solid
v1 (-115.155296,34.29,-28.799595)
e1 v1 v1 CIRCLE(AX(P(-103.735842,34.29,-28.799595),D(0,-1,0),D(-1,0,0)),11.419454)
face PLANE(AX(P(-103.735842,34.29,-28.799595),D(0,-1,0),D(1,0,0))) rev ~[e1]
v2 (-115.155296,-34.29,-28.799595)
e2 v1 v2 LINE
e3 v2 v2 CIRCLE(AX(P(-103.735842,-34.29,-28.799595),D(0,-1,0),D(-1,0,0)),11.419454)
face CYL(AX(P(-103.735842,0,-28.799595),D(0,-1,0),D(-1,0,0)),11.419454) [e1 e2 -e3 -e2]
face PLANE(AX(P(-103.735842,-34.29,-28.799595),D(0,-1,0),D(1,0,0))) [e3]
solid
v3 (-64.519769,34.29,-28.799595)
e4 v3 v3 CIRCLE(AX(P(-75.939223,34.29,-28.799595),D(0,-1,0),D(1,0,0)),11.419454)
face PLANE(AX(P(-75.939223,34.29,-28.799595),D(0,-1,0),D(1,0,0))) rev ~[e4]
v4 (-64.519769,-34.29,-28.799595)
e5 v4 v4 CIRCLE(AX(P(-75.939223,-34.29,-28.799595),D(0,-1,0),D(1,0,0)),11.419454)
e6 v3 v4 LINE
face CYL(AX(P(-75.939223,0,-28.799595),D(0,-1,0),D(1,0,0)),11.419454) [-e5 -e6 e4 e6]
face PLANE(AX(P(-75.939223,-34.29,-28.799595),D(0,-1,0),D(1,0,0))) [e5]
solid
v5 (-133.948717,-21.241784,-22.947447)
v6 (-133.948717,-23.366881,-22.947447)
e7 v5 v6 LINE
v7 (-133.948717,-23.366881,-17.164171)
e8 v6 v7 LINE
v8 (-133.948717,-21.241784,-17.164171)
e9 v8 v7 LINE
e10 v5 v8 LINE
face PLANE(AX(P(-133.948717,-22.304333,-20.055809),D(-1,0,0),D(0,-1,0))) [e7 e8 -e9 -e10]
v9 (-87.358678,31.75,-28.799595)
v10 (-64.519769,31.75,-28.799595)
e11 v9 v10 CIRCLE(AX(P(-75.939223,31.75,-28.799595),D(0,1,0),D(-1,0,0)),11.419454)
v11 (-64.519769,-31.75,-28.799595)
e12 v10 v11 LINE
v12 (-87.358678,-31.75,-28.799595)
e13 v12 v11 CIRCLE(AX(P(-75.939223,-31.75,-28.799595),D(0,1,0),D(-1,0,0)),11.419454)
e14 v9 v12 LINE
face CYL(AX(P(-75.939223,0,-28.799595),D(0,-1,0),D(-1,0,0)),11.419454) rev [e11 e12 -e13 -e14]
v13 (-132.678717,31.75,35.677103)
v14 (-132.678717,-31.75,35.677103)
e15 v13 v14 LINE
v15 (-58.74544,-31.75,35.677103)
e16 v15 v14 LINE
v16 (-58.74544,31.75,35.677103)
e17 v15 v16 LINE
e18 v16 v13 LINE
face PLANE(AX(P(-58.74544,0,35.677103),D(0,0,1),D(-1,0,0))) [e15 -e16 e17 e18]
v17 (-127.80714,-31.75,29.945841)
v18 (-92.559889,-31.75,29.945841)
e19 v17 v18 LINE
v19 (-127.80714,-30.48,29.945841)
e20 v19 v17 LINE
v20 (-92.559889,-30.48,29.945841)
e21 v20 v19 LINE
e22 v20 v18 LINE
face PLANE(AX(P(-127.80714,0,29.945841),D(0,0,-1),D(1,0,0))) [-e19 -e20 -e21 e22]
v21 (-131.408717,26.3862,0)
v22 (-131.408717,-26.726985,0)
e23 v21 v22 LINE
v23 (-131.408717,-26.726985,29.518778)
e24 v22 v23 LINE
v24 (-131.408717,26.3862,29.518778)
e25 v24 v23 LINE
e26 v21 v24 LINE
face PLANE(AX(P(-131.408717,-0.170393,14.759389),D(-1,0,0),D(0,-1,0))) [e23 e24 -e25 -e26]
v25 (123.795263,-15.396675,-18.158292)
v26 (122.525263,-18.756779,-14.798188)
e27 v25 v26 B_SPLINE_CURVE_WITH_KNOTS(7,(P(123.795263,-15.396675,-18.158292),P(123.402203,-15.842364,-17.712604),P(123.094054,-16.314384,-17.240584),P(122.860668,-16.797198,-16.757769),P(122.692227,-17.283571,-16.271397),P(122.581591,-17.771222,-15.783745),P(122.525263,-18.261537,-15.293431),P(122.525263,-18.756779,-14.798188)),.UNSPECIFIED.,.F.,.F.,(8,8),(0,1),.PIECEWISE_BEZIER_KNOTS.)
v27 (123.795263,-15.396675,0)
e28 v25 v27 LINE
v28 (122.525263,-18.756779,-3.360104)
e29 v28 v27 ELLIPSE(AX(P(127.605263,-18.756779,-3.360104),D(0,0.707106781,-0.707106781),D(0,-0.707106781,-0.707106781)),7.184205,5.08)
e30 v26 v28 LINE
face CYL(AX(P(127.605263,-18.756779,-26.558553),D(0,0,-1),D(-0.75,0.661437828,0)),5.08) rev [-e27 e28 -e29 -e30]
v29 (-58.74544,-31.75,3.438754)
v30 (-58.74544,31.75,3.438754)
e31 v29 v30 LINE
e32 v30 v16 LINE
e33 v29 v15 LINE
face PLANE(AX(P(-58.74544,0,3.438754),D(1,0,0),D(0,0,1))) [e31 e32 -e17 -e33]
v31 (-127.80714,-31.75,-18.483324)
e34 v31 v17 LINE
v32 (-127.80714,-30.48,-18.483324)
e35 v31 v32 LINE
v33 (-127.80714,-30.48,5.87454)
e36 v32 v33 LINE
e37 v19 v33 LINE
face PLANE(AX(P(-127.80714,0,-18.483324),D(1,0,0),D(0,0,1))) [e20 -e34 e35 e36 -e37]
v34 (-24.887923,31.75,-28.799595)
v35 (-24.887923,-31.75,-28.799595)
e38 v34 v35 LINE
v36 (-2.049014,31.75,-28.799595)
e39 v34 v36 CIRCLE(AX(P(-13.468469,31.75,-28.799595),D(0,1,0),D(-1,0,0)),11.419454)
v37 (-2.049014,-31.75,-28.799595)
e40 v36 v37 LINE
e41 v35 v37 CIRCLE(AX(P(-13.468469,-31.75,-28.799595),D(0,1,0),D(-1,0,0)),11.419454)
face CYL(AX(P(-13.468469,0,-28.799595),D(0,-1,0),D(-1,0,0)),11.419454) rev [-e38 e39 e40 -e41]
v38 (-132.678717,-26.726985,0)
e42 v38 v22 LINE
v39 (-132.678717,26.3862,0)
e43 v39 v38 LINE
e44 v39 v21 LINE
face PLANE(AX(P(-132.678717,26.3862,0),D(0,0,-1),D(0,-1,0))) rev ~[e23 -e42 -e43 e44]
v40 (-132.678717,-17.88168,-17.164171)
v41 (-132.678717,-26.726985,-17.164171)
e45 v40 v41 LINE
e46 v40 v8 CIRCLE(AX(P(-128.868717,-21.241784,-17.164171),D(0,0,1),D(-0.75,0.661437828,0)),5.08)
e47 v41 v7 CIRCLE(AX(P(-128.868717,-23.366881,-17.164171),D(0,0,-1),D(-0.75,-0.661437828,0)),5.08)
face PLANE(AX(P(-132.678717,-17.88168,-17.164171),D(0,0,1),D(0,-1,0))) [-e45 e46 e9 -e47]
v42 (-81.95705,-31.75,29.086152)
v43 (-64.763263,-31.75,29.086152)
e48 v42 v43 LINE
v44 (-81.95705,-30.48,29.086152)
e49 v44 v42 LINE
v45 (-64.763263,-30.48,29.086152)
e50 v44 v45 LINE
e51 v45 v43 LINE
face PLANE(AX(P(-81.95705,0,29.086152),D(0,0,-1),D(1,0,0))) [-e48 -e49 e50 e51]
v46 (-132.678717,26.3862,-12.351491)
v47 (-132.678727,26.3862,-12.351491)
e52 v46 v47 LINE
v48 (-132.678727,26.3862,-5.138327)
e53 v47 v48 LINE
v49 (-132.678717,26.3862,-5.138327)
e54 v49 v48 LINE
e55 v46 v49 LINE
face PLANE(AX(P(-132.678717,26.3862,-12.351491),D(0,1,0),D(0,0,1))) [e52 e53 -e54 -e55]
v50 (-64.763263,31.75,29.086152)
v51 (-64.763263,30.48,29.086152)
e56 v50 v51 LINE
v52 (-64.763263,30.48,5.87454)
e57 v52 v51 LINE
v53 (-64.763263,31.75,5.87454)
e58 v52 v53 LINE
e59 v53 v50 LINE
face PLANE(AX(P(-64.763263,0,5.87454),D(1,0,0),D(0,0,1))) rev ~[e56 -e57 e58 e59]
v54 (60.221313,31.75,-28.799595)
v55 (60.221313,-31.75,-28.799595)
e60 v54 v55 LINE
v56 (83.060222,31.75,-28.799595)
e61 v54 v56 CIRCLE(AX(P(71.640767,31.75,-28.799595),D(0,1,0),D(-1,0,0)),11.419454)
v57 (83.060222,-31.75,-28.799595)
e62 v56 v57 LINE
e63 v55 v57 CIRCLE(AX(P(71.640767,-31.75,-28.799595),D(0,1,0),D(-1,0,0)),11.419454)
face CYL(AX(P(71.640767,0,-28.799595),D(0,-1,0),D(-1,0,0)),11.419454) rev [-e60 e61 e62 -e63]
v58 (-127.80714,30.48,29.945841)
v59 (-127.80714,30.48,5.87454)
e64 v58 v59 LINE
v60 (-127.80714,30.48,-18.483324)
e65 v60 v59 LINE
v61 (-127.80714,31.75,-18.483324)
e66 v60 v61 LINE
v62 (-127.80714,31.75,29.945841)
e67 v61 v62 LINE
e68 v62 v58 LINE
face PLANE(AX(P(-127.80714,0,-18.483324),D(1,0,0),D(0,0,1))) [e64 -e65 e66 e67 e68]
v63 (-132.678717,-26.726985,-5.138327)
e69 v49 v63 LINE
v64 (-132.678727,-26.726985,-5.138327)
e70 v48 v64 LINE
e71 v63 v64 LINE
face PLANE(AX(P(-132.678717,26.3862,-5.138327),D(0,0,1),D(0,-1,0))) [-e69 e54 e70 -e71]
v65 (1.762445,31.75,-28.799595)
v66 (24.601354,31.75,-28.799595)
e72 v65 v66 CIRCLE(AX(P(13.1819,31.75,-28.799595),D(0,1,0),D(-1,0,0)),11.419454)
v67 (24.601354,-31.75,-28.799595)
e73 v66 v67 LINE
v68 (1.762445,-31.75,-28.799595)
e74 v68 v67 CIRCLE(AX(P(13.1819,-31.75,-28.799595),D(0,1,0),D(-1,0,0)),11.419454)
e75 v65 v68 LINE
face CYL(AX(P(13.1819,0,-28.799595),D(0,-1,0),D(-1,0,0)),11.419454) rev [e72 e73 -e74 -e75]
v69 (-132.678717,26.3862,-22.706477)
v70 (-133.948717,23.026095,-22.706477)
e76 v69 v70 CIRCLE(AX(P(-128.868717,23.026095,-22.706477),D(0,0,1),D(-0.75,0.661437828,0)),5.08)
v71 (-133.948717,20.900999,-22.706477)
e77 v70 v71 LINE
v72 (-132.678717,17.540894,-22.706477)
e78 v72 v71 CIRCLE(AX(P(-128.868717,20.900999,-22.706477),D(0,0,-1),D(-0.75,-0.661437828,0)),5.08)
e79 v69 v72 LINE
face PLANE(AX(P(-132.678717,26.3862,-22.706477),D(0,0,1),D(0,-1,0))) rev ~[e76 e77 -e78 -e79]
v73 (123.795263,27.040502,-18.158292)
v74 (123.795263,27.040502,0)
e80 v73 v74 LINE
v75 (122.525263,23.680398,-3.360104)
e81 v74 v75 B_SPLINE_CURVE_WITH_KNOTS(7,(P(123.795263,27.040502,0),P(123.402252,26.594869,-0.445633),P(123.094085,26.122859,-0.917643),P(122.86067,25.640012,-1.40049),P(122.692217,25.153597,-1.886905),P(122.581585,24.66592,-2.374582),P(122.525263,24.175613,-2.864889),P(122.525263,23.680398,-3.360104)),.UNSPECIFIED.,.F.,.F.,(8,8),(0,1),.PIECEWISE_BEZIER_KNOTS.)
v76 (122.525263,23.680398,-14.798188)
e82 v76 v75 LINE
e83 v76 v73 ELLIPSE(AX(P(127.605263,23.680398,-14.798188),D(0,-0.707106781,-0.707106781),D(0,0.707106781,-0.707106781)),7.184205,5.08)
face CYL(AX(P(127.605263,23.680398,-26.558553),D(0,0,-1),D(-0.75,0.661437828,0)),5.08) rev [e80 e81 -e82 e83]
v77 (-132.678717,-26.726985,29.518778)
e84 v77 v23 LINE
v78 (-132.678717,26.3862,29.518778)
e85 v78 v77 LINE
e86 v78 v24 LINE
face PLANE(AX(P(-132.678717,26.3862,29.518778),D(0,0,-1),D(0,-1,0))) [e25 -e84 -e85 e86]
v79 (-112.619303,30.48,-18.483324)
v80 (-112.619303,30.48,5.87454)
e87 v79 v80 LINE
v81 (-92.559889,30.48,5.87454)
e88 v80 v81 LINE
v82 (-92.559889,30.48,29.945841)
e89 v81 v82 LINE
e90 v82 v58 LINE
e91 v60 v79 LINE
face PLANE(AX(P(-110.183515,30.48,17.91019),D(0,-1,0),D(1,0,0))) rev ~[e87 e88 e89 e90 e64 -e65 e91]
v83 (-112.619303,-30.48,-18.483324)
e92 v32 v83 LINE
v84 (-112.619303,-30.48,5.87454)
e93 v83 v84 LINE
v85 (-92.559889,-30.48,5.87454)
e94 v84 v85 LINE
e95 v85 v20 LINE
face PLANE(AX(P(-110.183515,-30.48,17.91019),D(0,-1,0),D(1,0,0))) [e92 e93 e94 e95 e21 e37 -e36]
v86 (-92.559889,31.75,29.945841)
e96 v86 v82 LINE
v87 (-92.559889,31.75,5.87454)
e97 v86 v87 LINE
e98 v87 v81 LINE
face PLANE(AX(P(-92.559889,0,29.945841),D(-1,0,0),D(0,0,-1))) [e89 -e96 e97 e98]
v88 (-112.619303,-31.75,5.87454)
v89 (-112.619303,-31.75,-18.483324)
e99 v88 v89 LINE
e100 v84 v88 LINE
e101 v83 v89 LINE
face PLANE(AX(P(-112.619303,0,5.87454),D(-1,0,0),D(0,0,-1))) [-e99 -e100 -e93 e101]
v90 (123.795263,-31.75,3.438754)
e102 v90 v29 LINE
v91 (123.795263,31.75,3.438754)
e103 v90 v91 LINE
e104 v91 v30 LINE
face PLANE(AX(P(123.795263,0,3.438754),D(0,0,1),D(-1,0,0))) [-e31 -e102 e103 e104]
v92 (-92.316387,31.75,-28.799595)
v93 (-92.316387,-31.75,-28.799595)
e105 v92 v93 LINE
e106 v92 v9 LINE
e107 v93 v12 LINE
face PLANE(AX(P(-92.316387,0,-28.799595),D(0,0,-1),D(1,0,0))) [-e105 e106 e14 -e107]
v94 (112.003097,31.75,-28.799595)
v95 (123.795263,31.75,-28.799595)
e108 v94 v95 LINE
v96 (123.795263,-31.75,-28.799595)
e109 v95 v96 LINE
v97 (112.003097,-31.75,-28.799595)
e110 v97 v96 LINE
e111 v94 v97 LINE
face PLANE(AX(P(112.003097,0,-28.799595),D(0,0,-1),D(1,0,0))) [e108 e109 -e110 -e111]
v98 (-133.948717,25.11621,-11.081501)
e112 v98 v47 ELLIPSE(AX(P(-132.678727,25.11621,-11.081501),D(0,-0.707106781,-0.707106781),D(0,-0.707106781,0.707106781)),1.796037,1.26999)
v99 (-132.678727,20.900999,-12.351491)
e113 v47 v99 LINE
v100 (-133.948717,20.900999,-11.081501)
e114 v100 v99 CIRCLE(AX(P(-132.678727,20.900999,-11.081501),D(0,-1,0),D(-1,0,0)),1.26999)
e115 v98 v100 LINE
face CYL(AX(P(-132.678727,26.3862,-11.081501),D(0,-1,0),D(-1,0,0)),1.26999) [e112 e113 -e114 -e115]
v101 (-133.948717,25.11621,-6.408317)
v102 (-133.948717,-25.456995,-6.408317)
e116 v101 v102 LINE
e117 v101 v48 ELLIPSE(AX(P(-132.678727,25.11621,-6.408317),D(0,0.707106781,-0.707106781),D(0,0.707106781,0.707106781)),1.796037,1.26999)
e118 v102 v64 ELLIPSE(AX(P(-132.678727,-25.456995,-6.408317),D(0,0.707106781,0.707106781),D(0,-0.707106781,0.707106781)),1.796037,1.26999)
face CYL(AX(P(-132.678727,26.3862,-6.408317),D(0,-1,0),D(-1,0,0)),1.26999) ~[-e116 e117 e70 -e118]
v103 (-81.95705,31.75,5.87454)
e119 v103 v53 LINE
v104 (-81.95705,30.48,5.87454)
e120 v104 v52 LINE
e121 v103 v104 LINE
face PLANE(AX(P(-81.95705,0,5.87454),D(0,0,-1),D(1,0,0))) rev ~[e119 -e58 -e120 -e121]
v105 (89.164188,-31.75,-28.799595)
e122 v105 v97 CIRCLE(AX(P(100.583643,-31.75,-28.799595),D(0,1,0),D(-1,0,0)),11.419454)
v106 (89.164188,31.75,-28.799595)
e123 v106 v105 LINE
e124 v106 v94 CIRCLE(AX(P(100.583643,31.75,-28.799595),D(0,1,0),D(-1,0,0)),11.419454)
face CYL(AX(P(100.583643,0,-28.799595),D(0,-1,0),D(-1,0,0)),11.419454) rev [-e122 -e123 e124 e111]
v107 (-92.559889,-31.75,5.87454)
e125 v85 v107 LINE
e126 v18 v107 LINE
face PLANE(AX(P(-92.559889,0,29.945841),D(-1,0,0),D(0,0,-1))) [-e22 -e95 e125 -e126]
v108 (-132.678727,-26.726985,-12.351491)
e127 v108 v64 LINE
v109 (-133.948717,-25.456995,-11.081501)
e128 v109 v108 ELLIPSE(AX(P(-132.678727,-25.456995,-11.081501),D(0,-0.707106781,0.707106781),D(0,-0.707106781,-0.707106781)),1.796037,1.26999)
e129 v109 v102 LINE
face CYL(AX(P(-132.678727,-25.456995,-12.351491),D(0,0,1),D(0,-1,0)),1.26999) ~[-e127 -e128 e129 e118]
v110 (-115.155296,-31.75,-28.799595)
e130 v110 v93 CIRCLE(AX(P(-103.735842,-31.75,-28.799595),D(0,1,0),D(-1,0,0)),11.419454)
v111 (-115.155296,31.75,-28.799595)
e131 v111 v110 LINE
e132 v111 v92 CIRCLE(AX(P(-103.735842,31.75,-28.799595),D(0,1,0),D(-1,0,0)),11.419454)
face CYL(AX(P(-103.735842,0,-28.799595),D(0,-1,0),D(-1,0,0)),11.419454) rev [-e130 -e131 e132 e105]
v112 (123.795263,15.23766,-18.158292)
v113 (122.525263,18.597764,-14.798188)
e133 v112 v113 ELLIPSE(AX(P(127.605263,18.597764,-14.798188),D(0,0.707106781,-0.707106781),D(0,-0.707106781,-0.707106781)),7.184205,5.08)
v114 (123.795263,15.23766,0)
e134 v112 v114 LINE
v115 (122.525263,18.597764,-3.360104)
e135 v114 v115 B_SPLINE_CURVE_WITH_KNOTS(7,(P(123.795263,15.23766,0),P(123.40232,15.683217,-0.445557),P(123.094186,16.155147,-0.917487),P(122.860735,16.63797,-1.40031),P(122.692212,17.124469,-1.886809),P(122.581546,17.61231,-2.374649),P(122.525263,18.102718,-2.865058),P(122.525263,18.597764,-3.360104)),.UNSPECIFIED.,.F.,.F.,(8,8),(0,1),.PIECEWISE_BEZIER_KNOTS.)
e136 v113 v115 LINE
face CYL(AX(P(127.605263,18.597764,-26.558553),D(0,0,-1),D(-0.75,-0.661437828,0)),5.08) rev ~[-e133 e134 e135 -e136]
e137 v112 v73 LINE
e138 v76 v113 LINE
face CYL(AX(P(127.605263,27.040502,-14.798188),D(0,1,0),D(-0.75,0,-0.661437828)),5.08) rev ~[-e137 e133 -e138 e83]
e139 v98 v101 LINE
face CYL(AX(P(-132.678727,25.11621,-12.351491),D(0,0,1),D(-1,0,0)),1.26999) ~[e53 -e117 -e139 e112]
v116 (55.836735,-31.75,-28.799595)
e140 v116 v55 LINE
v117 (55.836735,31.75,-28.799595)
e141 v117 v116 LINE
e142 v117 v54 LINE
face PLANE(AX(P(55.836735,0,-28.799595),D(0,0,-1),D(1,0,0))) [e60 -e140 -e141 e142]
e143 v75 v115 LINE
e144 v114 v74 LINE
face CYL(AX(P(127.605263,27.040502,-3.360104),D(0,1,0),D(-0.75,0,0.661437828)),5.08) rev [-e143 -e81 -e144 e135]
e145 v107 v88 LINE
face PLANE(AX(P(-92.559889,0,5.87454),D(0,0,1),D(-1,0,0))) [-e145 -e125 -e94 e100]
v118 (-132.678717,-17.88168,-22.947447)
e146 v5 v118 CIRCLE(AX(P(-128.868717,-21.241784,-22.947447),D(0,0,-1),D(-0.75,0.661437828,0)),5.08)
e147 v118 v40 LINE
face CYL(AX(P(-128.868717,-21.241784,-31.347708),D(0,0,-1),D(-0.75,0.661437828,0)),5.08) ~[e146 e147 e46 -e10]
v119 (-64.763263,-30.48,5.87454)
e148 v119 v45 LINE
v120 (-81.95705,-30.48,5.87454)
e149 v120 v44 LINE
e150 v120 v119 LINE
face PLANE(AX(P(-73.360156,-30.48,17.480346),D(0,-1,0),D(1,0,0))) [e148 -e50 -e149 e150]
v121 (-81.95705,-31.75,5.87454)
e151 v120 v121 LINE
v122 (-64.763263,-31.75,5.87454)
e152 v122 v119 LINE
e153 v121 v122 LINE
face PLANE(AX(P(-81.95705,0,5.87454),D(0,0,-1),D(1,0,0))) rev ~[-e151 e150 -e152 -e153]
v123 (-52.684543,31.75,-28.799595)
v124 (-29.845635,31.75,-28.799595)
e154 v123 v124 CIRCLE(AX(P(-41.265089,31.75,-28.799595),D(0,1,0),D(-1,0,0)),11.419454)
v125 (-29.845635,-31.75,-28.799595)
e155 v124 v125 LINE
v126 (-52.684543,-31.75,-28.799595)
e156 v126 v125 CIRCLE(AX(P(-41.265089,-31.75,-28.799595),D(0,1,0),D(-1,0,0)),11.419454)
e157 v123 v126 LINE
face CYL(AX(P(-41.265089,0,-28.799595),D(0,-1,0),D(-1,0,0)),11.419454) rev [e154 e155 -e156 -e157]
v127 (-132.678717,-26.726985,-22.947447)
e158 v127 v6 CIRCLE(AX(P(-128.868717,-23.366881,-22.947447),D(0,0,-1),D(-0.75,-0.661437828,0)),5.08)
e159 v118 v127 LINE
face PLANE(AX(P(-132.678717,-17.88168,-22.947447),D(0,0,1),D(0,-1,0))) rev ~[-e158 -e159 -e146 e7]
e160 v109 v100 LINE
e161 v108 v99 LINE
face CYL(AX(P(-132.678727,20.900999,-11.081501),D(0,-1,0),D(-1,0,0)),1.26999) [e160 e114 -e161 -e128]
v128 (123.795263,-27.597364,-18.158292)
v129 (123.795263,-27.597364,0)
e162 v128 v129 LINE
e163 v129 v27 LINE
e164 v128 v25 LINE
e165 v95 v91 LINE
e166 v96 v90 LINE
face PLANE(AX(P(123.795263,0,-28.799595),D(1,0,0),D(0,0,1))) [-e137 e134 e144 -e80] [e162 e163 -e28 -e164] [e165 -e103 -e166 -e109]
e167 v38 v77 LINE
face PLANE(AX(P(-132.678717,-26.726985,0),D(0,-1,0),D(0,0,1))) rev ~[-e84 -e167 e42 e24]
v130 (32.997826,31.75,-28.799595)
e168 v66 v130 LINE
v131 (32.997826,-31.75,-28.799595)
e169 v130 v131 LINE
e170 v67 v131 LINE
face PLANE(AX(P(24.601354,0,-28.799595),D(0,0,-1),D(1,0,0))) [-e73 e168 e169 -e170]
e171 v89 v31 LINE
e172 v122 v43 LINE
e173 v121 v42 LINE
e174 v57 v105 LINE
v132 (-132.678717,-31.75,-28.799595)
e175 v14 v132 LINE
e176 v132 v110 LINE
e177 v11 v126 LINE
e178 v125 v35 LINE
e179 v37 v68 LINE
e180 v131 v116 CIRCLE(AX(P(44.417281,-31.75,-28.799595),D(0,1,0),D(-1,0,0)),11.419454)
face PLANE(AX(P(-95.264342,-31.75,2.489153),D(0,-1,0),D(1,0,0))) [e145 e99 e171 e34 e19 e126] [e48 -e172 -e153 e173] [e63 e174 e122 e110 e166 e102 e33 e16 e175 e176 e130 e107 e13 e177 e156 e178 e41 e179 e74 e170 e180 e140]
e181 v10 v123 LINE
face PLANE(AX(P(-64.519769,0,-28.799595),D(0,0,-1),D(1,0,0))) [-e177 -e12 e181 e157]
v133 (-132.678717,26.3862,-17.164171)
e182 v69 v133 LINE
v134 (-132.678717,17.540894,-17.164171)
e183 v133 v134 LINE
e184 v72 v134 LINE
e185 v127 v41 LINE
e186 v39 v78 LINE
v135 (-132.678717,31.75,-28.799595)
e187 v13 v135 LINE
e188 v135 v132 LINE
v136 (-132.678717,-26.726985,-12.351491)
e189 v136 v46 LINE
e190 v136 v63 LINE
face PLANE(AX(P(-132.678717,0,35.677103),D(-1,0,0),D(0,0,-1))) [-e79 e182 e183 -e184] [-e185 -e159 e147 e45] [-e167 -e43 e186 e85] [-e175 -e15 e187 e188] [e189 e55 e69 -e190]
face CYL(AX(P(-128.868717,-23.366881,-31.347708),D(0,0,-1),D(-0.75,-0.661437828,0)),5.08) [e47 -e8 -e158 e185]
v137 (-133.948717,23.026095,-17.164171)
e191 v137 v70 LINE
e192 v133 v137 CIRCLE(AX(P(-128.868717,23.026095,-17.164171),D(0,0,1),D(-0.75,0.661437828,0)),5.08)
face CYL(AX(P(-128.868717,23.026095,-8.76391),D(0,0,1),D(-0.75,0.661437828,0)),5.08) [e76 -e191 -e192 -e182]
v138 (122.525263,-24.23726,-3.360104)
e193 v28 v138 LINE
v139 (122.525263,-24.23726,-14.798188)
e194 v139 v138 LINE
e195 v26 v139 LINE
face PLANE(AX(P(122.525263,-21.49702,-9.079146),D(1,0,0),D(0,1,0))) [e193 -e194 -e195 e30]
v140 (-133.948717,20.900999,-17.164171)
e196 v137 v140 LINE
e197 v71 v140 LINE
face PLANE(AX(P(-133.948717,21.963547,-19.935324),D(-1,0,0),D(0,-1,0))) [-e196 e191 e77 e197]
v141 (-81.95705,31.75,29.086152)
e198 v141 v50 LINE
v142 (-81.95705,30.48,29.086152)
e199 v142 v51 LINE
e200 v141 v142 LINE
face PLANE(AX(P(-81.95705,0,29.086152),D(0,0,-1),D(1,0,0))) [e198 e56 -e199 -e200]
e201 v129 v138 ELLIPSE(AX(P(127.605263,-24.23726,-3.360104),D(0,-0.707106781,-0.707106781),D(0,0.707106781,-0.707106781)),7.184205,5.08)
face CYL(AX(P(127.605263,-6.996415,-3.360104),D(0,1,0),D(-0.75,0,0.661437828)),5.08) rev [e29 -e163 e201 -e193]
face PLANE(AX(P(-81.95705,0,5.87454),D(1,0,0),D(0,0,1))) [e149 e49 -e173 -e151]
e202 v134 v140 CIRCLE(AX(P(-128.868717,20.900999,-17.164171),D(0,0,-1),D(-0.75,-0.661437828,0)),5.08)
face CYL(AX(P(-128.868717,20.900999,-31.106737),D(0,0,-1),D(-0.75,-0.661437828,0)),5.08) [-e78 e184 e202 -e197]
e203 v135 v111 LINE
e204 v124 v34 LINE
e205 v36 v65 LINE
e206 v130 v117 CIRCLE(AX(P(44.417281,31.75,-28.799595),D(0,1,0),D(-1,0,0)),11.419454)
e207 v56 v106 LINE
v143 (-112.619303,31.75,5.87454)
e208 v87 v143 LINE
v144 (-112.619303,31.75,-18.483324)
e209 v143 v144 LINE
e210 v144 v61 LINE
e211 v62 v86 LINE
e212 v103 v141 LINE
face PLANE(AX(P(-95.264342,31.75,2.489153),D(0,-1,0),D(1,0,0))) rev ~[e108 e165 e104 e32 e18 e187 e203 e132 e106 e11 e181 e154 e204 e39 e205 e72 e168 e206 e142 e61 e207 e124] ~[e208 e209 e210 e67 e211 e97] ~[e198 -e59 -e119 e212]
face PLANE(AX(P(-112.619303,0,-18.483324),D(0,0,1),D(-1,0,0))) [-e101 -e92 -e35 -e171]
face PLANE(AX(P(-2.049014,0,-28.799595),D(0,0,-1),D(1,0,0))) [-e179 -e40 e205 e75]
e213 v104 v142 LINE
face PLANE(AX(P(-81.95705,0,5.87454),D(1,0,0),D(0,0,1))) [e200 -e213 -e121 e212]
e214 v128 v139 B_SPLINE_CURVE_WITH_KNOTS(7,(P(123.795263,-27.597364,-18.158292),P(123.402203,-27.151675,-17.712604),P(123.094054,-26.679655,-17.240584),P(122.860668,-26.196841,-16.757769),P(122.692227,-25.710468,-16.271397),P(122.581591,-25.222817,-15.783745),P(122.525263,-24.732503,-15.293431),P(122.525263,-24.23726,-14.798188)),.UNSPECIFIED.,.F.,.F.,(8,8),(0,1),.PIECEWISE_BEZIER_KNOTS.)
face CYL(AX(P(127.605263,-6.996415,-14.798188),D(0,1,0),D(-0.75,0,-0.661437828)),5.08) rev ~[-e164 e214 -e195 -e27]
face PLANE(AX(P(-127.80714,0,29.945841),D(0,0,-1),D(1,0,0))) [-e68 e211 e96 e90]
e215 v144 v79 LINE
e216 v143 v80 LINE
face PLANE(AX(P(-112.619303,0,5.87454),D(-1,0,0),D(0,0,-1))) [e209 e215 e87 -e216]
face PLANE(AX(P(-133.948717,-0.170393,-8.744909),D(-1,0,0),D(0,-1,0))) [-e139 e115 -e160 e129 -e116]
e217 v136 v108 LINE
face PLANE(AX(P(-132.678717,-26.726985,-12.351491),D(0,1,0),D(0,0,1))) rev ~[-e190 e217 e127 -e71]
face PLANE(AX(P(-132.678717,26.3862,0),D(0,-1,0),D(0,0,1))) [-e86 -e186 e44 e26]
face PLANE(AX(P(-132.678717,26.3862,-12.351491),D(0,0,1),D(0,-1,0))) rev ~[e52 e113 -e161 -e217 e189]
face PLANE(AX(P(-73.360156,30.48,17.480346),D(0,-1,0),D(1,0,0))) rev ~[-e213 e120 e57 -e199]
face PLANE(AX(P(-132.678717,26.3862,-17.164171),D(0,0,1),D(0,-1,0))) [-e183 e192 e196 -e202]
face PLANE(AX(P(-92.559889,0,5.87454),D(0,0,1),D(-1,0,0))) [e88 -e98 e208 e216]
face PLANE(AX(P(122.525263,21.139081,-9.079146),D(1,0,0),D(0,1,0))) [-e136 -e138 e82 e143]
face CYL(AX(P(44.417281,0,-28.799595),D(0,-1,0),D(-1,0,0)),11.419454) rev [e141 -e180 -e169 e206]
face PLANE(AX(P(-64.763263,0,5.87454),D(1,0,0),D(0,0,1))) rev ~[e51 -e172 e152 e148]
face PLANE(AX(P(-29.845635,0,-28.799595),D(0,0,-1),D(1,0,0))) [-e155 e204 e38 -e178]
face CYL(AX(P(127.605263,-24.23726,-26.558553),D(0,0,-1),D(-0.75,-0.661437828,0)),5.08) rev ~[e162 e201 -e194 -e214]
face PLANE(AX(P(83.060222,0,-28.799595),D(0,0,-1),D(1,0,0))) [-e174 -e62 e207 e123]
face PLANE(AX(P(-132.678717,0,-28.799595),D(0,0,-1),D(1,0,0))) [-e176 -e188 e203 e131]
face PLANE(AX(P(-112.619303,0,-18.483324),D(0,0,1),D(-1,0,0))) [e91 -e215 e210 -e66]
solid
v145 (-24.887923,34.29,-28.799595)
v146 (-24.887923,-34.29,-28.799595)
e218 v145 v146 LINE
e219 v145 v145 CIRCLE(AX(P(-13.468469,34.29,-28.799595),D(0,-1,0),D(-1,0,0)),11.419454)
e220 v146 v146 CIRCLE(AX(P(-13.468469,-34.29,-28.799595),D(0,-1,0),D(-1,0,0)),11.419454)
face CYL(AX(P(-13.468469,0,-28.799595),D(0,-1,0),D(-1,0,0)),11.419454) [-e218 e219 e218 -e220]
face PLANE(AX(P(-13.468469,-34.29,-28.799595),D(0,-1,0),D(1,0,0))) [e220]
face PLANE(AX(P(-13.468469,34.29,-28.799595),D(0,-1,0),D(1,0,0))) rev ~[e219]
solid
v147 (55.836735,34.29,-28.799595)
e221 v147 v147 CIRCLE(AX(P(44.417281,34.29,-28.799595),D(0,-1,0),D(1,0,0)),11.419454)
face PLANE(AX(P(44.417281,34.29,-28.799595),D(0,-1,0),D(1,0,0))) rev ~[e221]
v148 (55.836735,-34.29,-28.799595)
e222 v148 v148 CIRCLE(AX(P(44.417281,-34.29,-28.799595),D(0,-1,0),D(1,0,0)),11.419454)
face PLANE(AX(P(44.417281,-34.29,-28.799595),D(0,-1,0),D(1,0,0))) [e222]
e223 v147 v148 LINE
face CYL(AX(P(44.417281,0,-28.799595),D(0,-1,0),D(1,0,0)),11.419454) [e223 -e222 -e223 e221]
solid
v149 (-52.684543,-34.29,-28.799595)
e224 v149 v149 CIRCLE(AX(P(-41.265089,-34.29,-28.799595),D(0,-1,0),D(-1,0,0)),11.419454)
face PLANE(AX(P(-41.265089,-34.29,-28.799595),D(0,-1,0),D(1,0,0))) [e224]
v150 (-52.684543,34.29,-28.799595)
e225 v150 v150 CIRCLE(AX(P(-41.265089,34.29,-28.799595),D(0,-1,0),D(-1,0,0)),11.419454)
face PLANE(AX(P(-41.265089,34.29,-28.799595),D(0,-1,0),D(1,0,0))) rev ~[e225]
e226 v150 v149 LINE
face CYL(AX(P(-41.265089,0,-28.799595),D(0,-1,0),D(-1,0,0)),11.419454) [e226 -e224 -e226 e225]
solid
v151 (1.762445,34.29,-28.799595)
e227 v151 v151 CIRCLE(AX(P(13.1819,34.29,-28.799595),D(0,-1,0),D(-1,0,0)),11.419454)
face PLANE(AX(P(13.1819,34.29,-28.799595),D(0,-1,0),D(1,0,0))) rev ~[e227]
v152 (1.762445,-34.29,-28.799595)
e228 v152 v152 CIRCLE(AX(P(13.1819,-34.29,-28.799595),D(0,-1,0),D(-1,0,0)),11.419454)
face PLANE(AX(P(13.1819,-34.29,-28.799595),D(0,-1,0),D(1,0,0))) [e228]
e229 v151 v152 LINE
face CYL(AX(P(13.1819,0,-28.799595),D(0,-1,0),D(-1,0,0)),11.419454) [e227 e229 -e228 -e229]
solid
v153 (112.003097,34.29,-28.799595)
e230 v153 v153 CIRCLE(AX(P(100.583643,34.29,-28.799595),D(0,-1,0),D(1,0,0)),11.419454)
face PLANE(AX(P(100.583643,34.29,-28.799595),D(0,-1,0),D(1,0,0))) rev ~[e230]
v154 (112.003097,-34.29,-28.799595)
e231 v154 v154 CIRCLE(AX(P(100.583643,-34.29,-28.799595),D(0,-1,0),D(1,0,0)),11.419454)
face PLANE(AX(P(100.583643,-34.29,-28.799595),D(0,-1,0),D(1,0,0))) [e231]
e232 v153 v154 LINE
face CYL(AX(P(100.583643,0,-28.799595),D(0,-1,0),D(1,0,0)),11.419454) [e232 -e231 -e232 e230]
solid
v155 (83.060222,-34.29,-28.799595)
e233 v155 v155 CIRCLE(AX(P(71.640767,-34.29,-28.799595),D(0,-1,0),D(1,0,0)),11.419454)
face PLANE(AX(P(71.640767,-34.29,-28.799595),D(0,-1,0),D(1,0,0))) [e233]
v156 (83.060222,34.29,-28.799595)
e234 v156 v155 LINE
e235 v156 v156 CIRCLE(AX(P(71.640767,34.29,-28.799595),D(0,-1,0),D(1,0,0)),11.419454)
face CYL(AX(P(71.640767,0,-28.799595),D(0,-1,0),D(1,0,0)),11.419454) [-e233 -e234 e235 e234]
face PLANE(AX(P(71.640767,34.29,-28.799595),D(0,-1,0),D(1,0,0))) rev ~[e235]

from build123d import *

# Parameters (mm, degrees)
F0_W         = 17.1937867999
F0_H         = 23.2116123661
F1_DEPTH     = 31.75
F2_W         = 8.8453050703
F2_H         = 5.5423062295
F2_H_2       = 5.7832766324
F2_W_2       = 53.1131848693
F2_H_3       = 7.2131637233
F3_DEPTH     = 1.27
F2_H_4       = 29.5187777961
F4_DEPTH     = 1.27
F5_T1_DEPTH  = 14.1835370451
F5_T6_DEPTH  = 22.3428270547
F5_T11_DEPTH = 22.3428270547
F6_R         = 1.26999
F7_DEPTH     = 34.29
F0_W_2       = 15.1878371835
F0_H_2       = 24.3578637019
F8_DEPTH     = 30.48
F9_W         = 12.2006889433
F9_H         = 18.1582923979
F9_W_2       = 11.8028419092
F10_DEPTH    = 1.27
F11_T1_DEPTH = 26.5585528105
F11_T3_DEPTH = 20.6009493559
F11_T5_DEPTH = 20.2031023219


# Not quite as in the source:
# - a fillet or chamfer that OpenCascade refuses, or shapes differently, is made with other operations: its cross-section is extruded or revolved along the edge and cut away or added
# - a fillet or chamfer is up to 0.001 mm smaller than in the source, because OpenCascade refuses the exact size


with BuildPart() as f1:
    # F0 (on Front) → F1 (new body, symmetric)
    with BuildSketch(Plane.XZ):
        with BuildLine():
            Line((-58.7454400957, 35.6771033257), (-132.6787173748, 35.6771033257))
            Line((-132.6787173748, 35.6771033257), (-132.6787173748, -28.7995953113))
            Line((-132.6787173748, -28.7995953113), (-115.1552961537, -28.7995953113))
            ThreePointArc((-115.1552961537, -28.7995953113), (-103.7358418107, -17.3801409683), (-92.3163874677, -28.7995953113))
            Line((-92.3163874677, -28.7995953113), (-87.3586775133, -28.7995953113))
            ThreePointArc((-87.3586775133, -28.7995953113), (-75.9392231703, -17.3801409683), (-64.5197688273, -28.7995953113))
            Line((-64.5197688273, -28.7995953113), (-58.7454400957, -28.7995953113))
            Line((-58.7454400957, -28.7995953113), (-58.7454400957, 3.4387540072))
            Line((-58.7454400957, 3.4387540072), (-58.7454400957, 35.6771033257))
        make_face()
        Polygon((-127.8071403503, 5.8745397255), (-127.8071403503, 29.9458410591), (-92.5598889589, 29.9458410591), (-92.5598889589, 5.8745397255), (-112.6193031669, 5.8745397255), (-112.6193031669, -18.4833239764), (-127.8071403503, -18.4833239764), align=None, mode=Mode.SUBTRACT)
        with Locations((-73.3601562679, 17.4803459086)):
            Rectangle(F0_W, F0_H, mode=Mode.SUBTRACT)
        with BuildLine():
            Line((123.7952634692, 3.4387540072), (-58.7454400957, 3.4387540072))
            Line((-58.7454400957, 3.4387540072), (-58.7454400957, -28.7995953113))
            Line((-58.7454400957, -28.7995953113), (-52.6845434078, -28.7995953113))
            ThreePointArc((-52.6845434078, -28.7995953113), (-41.2650890648, -17.3801409683), (-29.8456347218, -28.7995953113))
            Line((-29.8456347218, -28.7995953113), (-24.8879229048, -28.7995953113))
            ThreePointArc((-24.8879229048, -28.7995953113), (-13.4684685618, -17.3801409683), (-2.0490142188, -28.7995953113))
            Line((-2.0490142188, -28.7995953113), (1.7624453312, -28.7995953113))
            ThreePointArc((1.7624453312, -28.7995953113), (13.1818996742, -17.3801409683), (24.6013540172, -28.7995953113))
            Line((24.6013540172, -28.7995953113), (32.9978263608, -28.7995953113))
            ThreePointArc((32.9978263608, -28.7995953113), (44.4172807038, -17.3801409683), (55.8367350468, -28.7995953113))
            Line((55.8367350468, -28.7995953113), (60.2213128141, -28.7995953113))
            ThreePointArc((60.2213128141, -28.7995953113), (71.6407671571, -17.3801409683), (83.0602215001, -28.7995953113))
            Line((83.0602215001, -28.7995953113), (89.1641883782, -28.7995953113))
            ThreePointArc((89.1641883782, -28.7995953113), (100.5836427212, -17.3801409683), (112.0030970642, -28.7995953113))
            Line((112.0030970642, -28.7995953113), (123.7952634692, -28.7995953113))
            Line((123.7952634692, -28.7995953113), (123.7952634692, 3.4387540072))
        make_face()
    extrude(amount=F1_DEPTH, both=True)

    # F2 (on face) → F3 (join)
    with BuildSketch(Plane(origin=(-132.6787173748, 0, 0), x_dir=(0, -1, 0), z_dir=(-1, 0, 0))):
        with Locations((-21.9635469839, -19.9353238568)):
            Rectangle(F2_W, F2_H)
        with Locations((22.3043328151, -20.0558090582)):
            Rectangle(F2_W, F2_H_2)
        with Locations((0.1703929156, -8.744909234)):
            Rectangle(F2_W_2, F2_H_3)
    extrude(amount=F3_DEPTH)

    # F2 (on face) → F4 (cut)
    with BuildSketch(Plane(origin=(-132.6787173748, 0, 0), x_dir=(0, -1, 0), z_dir=(-1, 0, 0))):
        with Locations((0.1703929156, 14.759388898)):
            Rectangle(F2_W_2, F2_H_4)
    extrude(amount=-F4_DEPTH, mode=Mode.SUBTRACT)

    # F5: fillet of radius 5.08 on 4 edges, made by hand

    # F5_s2 → F5_t1 (cut)
    with BuildSketch(Plane.XY.offset(-31.3477077871)):
        with BuildLine():
            ThreePointArc((-132.6787173748, -26.7269853503), (-133.620622256, -25.1629324094), (-133.9487173748, -23.3668811852))
            Line((-133.9487173748, -23.3668811852), (-133.9487173748, -26.7269853503))
            Line((-133.9487173748, -26.7269853503), (-132.6787173748, -26.7269853503))
        make_face()
        with BuildLine():
            ThreePointArc((-132.6787173748, -17.88168028), (-133.620622256, -19.4457332208), (-133.9487173748, -21.241784445))
            Line((-133.9487173748, -21.241784445), (-133.9487173748, -17.88168028))
            Line((-133.9487173748, -17.88168028), (-132.6787173748, -17.88168028))
        make_face()
    extrude(amount=F5_T1_DEPTH, mode=Mode.SUBTRACT)


with BuildPart() as f5_tool4:
    # F5_s5 → F5_t6 (new body)
    with BuildSketch(Plane.XY.offset(-31.1067373841)):
        with BuildLine():
            ThreePointArc((-132.6787173748, 17.5408944488), (-133.620622256, 19.1049473896), (-133.9487173748, 20.9009986138))
            Line((-133.9487173748, 20.9009986138), (-133.9487173748, 17.5408944488))
            Line((-133.9487173748, 17.5408944488), (-132.6787173748, 17.5408944488))
        make_face()
    extrude(amount=F5_T6_DEPTH)

    split(bisect_by=Plane.XY.offset(-12.3514910956), keep=Keep.BOTTOM)


with BuildPart() as f1_1:
    add(f1.part)

    # F5_t3: cut F5_tool4
    add(f5_tool4.part, mode=Mode.SUBTRACT)


with BuildPart() as f5_tool9:
    # F5_s10 → F5_t11 (new body)
    with BuildSketch(Plane.XY.offset(-8.7639103294)):
        with BuildLine():
            ThreePointArc((-132.6787173748, 26.386199519), (-133.620622256, 24.8221465782), (-133.9487173748, 23.026095354))
            Line((-133.9487173748, 23.026095354), (-133.9487173748, 26.386199519))
            Line((-133.9487173748, 26.386199519), (-132.6787173748, 26.386199519))
        make_face()
    extrude(amount=-F5_T11_DEPTH)

    split(bisect_by=Plane.XY.offset(-12.3514910956), keep=Keep.BOTTOM)


with BuildPart() as f1_2:
    add(f1_1.part)

    # F5_t8: cut F5_tool9
    add(f5_tool9.part, mode=Mode.SUBTRACT)

    # F6 (radius 1.27 in the source; OpenCascade refuses exactly that, so slightly less here)
    f6_edges = [f1_2.edges().sort_by_distance(p)[0] for p in [
        (-133.948717, -0.170393, -12.351491),
        (-133.948717, 26.3862, -8.744909),
        (-133.948717, -0.170393, -5.138327),
        (-133.948717, -26.726985, -8.744909),
    ]]
    fillet(f6_edges, radius=F6_R)

    # F0 (on Front) → F8 (join, symmetric)
    with BuildSketch(Plane.XZ):
        Polygon((-92.5598889589, 29.9458410591), (-127.8071403503, 29.9458410591), (-127.8071403503, 5.8745397255), (-112.6193031669, 5.8745397255), (-92.5598889589, 5.8745397255), align=None)
        with Locations((-120.2132217586, -6.3043921255)):
            Rectangle(F0_W_2, F0_H_2)
        with Locations((-73.3601562679, 17.4803459086)):
            Rectangle(F0_W, F0_H)
    extrude(amount=F8_DEPTH, both=True)

    # F9 (on face) → F10 (cut)
    with BuildSketch(Plane.YZ.offset(123.7952634692)):
        with Locations((-21.4970195666, -9.0791461989)):
            Rectangle(F9_W, F9_H)
        with Locations((21.1390811019, -9.0791461989)):
            Rectangle(F9_W_2, F9_H)
    extrude(amount=-F10_DEPTH, mode=Mode.SUBTRACT)

    # F11: fillet of radius 5.08 on 8 edges, made by hand

    # F11_s2 → F11_t1 (join)
    with BuildSketch(Plane.XY.offset(-26.5585528105)):
        with BuildLine():
            ThreePointArc((123.7952634692, -27.5973640382), (122.853358588, -26.0333110974), (122.5252634692, -24.2372598732))
            Line((122.5252634692, -24.2372598732), (122.5252634692, -27.5973640382))
            Line((122.5252634692, -27.5973640382), (123.7952634692, -27.5973640382))
        make_face()
        with BuildLine():
            ThreePointArc((123.7952634692, -15.396675095), (122.853358588, -16.9607280358), (122.5252634692, -18.75677926))
            Line((122.5252634692, -18.75677926), (122.5252634692, -15.396675095))
            Line((122.5252634692, -15.396675095), (123.7952634692, -15.396675095))
        make_face()
        with BuildLine():
            ThreePointArc((123.7952634692, 15.2376601472), (122.853358588, 16.8017130881), (122.5252634692, 18.5977643123))
            Line((122.5252634692, 18.5977643123), (122.5252634692, 15.2376601472))
            Line((122.5252634692, 15.2376601472), (123.7952634692, 15.2376601472))
        make_face()
        with BuildLine():
            ThreePointArc((123.7952634692, 27.0405020565), (122.853358588, 25.4764491156), (122.5252634692, 23.6803978914))
            Line((122.5252634692, 23.6803978914), (122.5252634692, 27.0405020565))
            Line((122.5252634692, 27.0405020565), (123.7952634692, 27.0405020565))
        make_face()
    extrude(amount=F11_T1_DEPTH)

    # F11_s4 → F11_t3 (join)
    with BuildSketch(Plane.XZ.offset(6.9964146823)):
        with BuildLine():
            ThreePointArc((123.7952634692, 0), (122.853358588, -1.5640529408), (122.5252634692, -3.3601041651))
            Line((122.5252634692, -3.3601041651), (122.5252634692, 0))
            Line((122.5252634692, 0), (123.7952634692, 0))
        make_face()
        with BuildLine():
            ThreePointArc((123.7952634692, -18.1582923979), (122.853358588, -16.594239457), (122.5252634692, -14.7981882328))
            Line((122.5252634692, -14.7981882328), (122.5252634692, -18.1582923979))
            Line((122.5252634692, -18.1582923979), (123.7952634692, -18.1582923979))
        make_face()
    extrude(amount=F11_T3_DEPTH)

    # F11_s6 → F11_t5 (join)
    with BuildSketch(Plane.XZ.offset(-27.0405020565)):
        with BuildLine():
            ThreePointArc((123.7952634692, 0), (122.853358588, -1.5640529408), (122.5252634692, -3.3601041651))
            Line((122.5252634692, -3.3601041651), (122.5252634692, 0))
            Line((122.5252634692, 0), (123.7952634692, 0))
        make_face()
        with BuildLine():
            ThreePointArc((123.7952634692, -18.1582923979), (122.853358588, -16.594239457), (122.5252634692, -14.7981882328))
            Line((122.5252634692, -14.7981882328), (122.5252634692, -18.1582923979))
            Line((122.5252634692, -18.1582923979), (123.7952634692, -18.1582923979))
        make_face()
    extrude(amount=F11_T5_DEPTH)


with BuildPart() as f7:
    # F0 (on Front) → F7 (new body, symmetric)
    with BuildSketch(Plane.XZ):
        with BuildLine():
            ThreePointArc((-92.3163874677, -28.7995953113), (-103.7358418107, -17.3801409683), (-115.1552961537, -28.7995953113))
            ThreePointArc((-115.1552961537, -28.7995953113), (-103.7358418107, -40.2190496543), (-92.3163874677, -28.7995953113))
        make_face()
    extrude(amount=F7_DEPTH, both=True)


with BuildPart() as f7b:
    # F0 (on Front) → F7, piece 2 (new body, symmetric)
    with BuildSketch(Plane.XZ):
        with BuildLine():
            ThreePointArc((-87.3586775133, -28.7995953113), (-75.9392231703, -40.2190496543), (-64.5197688273, -28.7995953113))
            ThreePointArc((-64.5197688273, -28.7995953113), (-75.9392231703, -17.3801409683), (-87.3586775133, -28.7995953113))
        make_face()
    extrude(amount=F7_DEPTH, both=True)


with BuildPart() as f7c:
    # F0 (on Front) → F7, piece 3 (new body, symmetric)
    with BuildSketch(Plane.XZ):
        with BuildLine():
            ThreePointArc((-29.8456347218, -28.7995953113), (-41.2650890648, -17.3801409683), (-52.6845434078, -28.7995953113))
            ThreePointArc((-52.6845434078, -28.7995953113), (-41.2650890648, -40.2190496543), (-29.8456347218, -28.7995953113))
        make_face()
    extrude(amount=F7_DEPTH, both=True)


with BuildPart() as f7d:
    # F0 (on Front) → F7, piece 4 (new body, symmetric)
    with BuildSketch(Plane.XZ):
        with BuildLine():
            ThreePointArc((-2.0490142188, -28.7995953113), (-13.4684685618, -17.3801409683), (-24.8879229048, -28.7995953113))
            ThreePointArc((-24.8879229048, -28.7995953113), (-13.4684685618, -40.2190496543), (-2.0490142188, -28.7995953113))
        make_face()
    extrude(amount=F7_DEPTH, both=True)


with BuildPart() as f7e:
    # F0 (on Front) → F7, piece 5 (new body, symmetric)
    with BuildSketch(Plane.XZ):
        with BuildLine():
            ThreePointArc((24.6013540172, -28.7995953113), (13.1818996742, -17.3801409683), (1.7624453312, -28.7995953113))
            ThreePointArc((1.7624453312, -28.7995953113), (13.1818996742, -40.2190496543), (24.6013540172, -28.7995953113))
        make_face()
    extrude(amount=F7_DEPTH, both=True)


with BuildPart() as f7f:
    # F0 (on Front) → F7, piece 6 (new body, symmetric)
    with BuildSketch(Plane.XZ):
        with BuildLine():
            ThreePointArc((32.9978263608, -28.7995953113), (44.4172807038, -40.2190496543), (55.8367350468, -28.7995953113))
            ThreePointArc((55.8367350468, -28.7995953113), (44.4172807038, -17.3801409683), (32.9978263608, -28.7995953113))
        make_face()
    extrude(amount=F7_DEPTH, both=True)


with BuildPart() as f7g:
    # F0 (on Front) → F7, piece 7 (new body, symmetric)
    with BuildSketch(Plane.XZ):
        with BuildLine():
            ThreePointArc((60.2213128141, -28.7995953113), (71.6407671571, -40.2190496543), (83.0602215001, -28.7995953113))
            ThreePointArc((83.0602215001, -28.7995953113), (71.6407671571, -17.3801409683), (60.2213128141, -28.7995953113))
        make_face()
    extrude(amount=F7_DEPTH, both=True)


with BuildPart() as f7h:
    # F0 (on Front) → F7, piece 8 (new body, symmetric)
    with BuildSketch(Plane.XZ):
        with BuildLine():
            ThreePointArc((89.1641883782, -28.7995953113), (100.5836427212, -40.2190496543), (112.0030970642, -28.7995953113))
            ThreePointArc((112.0030970642, -28.7995953113), (100.5836427212, -17.3801409683), (89.1641883782, -28.7995953113))
        make_face()
    extrude(amount=F7_DEPTH, both=True)


solid = Compound([f1_2.part, f7.part, f7b.part, f7c.part, f7d.part, f7e.part, f7f.part, f7g.part, f7h.part])
